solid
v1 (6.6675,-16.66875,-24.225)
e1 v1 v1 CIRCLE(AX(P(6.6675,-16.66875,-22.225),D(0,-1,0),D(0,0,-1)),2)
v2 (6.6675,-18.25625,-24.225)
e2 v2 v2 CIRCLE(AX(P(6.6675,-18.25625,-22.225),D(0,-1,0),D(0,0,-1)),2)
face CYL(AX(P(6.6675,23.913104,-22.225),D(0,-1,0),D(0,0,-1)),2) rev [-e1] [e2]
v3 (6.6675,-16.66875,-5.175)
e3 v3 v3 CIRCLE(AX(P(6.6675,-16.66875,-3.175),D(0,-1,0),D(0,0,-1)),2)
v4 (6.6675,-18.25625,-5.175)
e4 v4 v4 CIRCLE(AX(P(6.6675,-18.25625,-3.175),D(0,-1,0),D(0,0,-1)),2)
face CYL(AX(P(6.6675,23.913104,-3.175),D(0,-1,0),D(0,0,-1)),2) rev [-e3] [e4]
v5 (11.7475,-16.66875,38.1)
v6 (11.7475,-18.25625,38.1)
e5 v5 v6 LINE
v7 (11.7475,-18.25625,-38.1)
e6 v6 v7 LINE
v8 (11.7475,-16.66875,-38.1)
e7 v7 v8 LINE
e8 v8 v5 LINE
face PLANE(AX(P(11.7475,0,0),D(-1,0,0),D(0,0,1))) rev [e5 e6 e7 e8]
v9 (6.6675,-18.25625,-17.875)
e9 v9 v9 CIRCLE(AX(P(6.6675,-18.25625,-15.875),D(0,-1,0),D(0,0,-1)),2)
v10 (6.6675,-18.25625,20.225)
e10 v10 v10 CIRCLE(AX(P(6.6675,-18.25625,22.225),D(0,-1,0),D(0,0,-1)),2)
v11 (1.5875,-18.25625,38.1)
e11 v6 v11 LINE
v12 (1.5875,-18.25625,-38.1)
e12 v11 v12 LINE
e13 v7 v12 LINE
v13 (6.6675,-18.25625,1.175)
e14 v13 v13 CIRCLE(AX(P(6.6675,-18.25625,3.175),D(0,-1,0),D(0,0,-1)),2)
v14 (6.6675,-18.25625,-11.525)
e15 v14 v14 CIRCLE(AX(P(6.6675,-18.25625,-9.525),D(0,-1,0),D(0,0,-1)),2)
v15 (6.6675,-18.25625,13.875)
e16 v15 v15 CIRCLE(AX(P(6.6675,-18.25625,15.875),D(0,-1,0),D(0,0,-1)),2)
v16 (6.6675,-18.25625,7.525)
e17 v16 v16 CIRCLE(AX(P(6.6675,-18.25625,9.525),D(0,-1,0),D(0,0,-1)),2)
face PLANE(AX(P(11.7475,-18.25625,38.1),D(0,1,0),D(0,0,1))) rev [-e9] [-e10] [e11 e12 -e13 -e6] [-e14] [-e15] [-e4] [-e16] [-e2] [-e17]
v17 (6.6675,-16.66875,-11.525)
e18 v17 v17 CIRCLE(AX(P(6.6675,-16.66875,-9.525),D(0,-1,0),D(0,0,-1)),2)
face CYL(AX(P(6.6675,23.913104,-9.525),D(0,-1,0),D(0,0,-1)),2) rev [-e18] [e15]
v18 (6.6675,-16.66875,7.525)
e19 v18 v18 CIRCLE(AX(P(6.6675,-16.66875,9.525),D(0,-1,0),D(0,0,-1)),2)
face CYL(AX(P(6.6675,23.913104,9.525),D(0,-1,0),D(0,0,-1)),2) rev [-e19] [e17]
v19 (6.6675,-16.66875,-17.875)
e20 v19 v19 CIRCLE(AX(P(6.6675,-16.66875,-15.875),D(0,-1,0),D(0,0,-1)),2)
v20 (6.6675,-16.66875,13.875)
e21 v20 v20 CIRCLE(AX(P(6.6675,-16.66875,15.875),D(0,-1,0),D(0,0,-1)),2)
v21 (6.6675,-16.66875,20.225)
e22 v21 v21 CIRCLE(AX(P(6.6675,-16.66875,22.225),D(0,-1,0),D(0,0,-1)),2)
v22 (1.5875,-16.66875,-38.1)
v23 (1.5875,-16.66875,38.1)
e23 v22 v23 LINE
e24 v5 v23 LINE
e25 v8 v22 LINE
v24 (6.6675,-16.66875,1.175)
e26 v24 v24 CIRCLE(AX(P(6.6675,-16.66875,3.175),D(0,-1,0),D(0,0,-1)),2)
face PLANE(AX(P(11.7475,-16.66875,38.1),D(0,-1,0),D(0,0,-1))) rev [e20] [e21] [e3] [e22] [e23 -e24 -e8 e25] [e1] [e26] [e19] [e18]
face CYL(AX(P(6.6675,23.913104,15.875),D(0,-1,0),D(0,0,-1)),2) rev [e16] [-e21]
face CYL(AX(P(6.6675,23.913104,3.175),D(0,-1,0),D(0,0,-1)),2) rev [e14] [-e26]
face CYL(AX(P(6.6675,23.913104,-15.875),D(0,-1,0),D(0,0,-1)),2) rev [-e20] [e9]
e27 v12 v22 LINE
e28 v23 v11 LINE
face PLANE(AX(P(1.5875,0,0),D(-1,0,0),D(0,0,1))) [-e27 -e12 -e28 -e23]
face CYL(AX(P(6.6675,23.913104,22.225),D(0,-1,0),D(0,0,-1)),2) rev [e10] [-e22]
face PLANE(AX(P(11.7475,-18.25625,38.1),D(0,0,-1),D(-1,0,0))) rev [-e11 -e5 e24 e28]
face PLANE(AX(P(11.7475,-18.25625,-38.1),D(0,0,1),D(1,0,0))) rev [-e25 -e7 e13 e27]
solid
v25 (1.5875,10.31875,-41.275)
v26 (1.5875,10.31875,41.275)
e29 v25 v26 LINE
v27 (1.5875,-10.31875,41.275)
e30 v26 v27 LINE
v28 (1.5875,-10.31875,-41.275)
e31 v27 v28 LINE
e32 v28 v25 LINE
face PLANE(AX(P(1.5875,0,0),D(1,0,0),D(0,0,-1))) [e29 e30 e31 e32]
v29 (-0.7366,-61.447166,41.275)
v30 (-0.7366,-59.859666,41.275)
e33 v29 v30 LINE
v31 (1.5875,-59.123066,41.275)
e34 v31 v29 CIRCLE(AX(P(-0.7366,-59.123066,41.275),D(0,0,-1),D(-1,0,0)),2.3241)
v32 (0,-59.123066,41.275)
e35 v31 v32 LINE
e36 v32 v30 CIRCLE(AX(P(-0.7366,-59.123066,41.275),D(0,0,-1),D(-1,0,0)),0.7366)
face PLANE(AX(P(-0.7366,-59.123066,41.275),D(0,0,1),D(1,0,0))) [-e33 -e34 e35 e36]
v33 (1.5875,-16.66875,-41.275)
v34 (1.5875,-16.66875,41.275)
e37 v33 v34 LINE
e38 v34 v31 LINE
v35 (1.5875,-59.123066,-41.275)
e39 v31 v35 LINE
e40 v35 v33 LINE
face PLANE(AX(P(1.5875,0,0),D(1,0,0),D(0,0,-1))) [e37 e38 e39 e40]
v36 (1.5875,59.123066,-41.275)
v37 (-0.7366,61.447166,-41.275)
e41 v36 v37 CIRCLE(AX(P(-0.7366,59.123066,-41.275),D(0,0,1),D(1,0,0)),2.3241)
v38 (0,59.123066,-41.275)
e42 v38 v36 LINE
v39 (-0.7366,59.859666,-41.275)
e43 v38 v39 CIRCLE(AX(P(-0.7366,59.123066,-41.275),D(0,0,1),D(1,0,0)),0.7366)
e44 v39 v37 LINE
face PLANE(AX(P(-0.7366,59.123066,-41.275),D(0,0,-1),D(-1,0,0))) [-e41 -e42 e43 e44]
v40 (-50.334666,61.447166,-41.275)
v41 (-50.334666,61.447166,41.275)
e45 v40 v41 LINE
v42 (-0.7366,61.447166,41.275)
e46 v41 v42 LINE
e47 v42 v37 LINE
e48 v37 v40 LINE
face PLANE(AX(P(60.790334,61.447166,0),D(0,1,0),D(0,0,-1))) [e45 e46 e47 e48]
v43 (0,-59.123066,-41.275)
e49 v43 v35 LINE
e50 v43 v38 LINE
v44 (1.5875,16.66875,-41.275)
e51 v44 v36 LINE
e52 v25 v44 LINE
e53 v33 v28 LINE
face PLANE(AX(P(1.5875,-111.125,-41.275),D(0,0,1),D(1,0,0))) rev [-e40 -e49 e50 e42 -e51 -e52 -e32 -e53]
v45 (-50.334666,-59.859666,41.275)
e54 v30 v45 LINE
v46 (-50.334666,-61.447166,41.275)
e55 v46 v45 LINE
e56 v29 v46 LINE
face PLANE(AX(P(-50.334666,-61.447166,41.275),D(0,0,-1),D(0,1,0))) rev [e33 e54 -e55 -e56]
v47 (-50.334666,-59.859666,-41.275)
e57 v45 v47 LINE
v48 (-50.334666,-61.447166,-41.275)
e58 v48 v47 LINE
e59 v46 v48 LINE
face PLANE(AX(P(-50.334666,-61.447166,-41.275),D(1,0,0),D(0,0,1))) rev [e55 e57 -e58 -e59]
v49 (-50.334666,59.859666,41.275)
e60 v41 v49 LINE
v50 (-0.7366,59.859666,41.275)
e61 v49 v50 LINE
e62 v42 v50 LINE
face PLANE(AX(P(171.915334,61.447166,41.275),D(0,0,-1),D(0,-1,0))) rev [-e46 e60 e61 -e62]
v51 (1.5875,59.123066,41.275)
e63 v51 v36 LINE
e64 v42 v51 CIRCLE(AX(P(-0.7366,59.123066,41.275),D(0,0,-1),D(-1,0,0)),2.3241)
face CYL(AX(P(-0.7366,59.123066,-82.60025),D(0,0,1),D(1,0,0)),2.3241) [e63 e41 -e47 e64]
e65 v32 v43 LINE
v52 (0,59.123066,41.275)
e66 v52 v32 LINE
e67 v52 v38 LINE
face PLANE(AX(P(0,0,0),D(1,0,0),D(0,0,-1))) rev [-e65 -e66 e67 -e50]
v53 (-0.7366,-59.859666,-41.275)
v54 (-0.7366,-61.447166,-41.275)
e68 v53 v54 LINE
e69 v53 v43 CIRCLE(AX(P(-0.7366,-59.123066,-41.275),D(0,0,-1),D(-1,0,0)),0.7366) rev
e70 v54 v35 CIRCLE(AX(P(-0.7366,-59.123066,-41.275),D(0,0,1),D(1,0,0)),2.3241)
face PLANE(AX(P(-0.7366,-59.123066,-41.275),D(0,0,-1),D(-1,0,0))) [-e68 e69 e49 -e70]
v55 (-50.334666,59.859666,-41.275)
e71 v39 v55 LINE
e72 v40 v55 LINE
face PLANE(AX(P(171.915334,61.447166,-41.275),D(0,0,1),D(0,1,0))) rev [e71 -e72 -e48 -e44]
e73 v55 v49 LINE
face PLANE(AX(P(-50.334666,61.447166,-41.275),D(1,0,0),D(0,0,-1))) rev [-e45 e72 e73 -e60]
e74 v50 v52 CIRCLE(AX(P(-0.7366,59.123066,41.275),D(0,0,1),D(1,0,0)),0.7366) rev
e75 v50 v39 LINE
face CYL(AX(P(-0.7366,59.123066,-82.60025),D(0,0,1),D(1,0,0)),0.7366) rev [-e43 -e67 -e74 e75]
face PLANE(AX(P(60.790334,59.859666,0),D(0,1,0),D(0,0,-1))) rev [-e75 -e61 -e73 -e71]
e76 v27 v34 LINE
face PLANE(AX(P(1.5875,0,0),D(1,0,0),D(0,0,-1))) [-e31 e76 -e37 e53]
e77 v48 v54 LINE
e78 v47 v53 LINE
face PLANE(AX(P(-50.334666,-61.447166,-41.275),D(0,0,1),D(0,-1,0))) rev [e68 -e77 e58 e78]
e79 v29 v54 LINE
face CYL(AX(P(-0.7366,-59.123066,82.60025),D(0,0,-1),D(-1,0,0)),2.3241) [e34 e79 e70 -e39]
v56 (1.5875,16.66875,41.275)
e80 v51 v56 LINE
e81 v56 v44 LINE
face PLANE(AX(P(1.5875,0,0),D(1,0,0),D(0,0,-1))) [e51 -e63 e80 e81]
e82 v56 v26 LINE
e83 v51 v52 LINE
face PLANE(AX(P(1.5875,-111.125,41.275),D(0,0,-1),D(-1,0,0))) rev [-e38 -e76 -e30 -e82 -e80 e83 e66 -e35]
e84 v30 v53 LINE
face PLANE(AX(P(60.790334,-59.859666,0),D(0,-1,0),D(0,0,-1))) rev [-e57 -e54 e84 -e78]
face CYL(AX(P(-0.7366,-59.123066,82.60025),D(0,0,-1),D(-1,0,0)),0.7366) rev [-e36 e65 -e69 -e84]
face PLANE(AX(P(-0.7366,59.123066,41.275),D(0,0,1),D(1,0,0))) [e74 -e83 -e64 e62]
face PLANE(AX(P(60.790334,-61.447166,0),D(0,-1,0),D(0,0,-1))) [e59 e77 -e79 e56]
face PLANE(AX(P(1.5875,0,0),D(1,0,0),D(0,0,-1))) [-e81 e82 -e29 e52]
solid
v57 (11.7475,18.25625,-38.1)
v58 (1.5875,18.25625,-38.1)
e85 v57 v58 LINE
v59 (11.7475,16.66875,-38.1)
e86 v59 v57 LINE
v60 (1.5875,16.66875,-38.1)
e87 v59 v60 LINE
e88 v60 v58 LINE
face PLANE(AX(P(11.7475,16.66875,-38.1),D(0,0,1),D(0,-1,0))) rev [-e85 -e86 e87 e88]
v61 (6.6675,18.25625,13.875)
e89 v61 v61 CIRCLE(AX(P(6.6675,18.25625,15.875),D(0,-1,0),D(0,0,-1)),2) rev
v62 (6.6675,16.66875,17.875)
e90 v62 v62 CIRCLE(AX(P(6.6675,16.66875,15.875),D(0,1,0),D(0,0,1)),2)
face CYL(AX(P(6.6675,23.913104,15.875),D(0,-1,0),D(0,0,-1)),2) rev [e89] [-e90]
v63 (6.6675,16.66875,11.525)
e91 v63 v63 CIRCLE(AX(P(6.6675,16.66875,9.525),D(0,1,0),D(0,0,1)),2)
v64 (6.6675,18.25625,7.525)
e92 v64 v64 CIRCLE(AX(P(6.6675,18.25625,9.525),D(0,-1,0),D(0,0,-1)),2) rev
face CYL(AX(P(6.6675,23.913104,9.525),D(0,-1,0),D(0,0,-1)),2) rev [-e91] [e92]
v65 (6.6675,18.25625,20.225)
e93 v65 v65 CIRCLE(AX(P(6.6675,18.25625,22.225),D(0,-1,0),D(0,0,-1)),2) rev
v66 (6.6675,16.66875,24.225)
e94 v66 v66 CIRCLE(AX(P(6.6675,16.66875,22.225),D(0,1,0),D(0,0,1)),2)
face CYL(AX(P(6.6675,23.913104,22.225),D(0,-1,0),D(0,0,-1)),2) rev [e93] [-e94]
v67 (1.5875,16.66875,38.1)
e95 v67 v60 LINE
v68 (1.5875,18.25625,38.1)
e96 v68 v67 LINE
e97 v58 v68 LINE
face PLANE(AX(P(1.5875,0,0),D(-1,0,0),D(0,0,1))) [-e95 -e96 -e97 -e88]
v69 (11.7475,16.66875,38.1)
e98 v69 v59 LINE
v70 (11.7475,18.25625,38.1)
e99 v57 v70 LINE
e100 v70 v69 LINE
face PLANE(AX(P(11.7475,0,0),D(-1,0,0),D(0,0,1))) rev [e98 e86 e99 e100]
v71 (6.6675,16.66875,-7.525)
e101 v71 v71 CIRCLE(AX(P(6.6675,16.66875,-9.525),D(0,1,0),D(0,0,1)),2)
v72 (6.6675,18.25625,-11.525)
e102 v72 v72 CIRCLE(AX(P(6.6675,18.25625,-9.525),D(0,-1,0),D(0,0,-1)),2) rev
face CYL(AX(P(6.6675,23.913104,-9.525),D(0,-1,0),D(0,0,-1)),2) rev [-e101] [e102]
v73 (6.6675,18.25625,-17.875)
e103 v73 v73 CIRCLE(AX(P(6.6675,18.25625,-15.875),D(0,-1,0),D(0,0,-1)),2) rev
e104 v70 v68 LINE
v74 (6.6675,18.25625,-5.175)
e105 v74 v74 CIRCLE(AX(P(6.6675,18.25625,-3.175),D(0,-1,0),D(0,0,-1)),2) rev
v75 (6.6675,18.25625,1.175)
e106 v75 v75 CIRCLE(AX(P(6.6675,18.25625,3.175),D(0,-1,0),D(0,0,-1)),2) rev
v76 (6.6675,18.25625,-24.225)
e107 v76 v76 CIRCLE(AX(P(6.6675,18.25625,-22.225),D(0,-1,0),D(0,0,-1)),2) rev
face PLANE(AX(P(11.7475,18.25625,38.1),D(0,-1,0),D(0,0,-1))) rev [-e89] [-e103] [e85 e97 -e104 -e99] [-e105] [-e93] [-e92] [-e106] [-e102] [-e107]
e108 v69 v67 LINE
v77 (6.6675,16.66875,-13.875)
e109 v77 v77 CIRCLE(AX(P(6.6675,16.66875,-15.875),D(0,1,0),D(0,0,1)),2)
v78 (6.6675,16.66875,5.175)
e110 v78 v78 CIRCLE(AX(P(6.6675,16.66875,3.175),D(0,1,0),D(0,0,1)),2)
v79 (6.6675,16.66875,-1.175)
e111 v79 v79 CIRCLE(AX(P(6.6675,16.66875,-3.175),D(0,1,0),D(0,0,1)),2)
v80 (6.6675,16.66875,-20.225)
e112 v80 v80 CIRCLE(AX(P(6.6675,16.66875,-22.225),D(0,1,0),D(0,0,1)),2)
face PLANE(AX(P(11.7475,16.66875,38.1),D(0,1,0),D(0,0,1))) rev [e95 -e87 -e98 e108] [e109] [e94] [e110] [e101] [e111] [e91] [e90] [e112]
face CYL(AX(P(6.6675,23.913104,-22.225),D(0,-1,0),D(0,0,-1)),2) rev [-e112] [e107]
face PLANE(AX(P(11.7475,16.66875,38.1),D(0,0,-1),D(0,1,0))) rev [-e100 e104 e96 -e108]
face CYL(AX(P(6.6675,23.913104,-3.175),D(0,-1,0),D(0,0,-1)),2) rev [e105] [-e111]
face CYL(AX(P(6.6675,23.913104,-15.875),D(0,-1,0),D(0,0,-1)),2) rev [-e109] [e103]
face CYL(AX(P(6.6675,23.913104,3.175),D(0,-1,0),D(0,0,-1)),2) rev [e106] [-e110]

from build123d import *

# Parameters (mm, degrees)
SKETCH1_W              = 82.55
SKETCH1_H              = 222.25
BASE_FLANGE1_DEPTH     = 1.5875
SKETCHED_START         = -41.275
SKETCHED_BEND1_DEPTH   = 82.55
SKETCHED_BEND1_2_DEPTH = 82.55
SKETCH8_W              = 76.2
SKETCH8_H              = 1.5875
BOSS_EXTRUDE1_DEPTH    = 10.16
BOSS_EXTRUDE1_2_DEPTH  = 10.16
CUT_EXTRUDE1_START     = -36.5125
SKETCH11_R             = 2
CUT_EXTRUDE1_DEPTH     = 36.5125


# Read off the part's stored shape, not the designer's step: Sketched Bend1
# Sheet-metal steps are written as plain solids
with BuildPart() as part:
    # Sketch1 → Base-Flange1 (new body)
    with BuildSketch(Plane(origin=(0, 0, 0), x_dir=(0, 0, -1), z_dir=(1, 0, 0))):
        Rectangle(SKETCH1_W, SKETCH1_H)
    extrude(amount=BASE_FLANGE1_DEPTH)

    # Sketched Bend1 outline → Sketched Bend1 (cut)
    with BuildSketch(Plane.XY.offset(SKETCHED_START)):
        with BuildLine():
            ThreePointArc((0, 61.3273484), (1.149317929, 60.481283273), (1.5875, 59.123065921))
            Line((1.5875, 59.123065921), (1.5875, 111.125))
            Line((1.5875, 111.125), (0, 111.125))
            Line((0, 111.125), (0, 61.3273484))
        make_face()
        with BuildLine():
            Line((1.5875, -111.125), (1.5875, -59.123065921))
            ThreePointArc((1.5875, -59.123065921), (1.149317929, -60.481283273), (0, -61.3273484))
            Line((0, -61.3273484), (0, -111.125))
            Line((0, -111.125), (1.5875, -111.125))
        make_face()
    extrude(amount=SKETCHED_BEND1_DEPTH, mode=Mode.SUBTRACT)

    # Sketched Bend1 2 outline → Sketched Bend1 2 (add)
    with BuildSketch(Plane.XY.offset(SKETCHED_START)):
        with BuildLine():
            Line((0, 59.123065921), (0, 61.3273484))
            ThreePointArc((0, 61.3273484), (-0.363459343, 61.417015977), (-0.7366, 61.447165921))
            Line((-0.7366, 61.447165921), (-50.334665921, 61.447165921))
            Line((-50.334665921, 61.447165921), (-50.334665921, 59.859665921))
            Line((-50.334665921, 59.859665921), (-0.7366, 59.859665921))
            ThreePointArc((-0.7366, 59.859665921), (-0.215745145, 59.643920776), (0, 59.123065921))
        make_face()
        with BuildLine():
            ThreePointArc((-0.7366, -61.447165921), (-0.363459343, -61.417015977), (0, -61.3273484))
            Line((0, -61.3273484), (0, -59.123065921))
            ThreePointArc((0, -59.123065921), (-0.215745145, -59.643920776), (-0.7366, -59.859665921))
            Line((-0.7366, -59.859665921), (-50.334665921, -59.859665921))
            Line((-50.334665921, -59.859665921), (-50.334665921, -61.447165921))
            Line((-50.334665921, -61.447165921), (-0.7366, -61.447165921))
        make_face()
    extrude(amount=SKETCHED_BEND1_2_DEPTH)


with BuildPart() as body_2:
    # Sketch8 → Boss-Extrude1 (new body)
    with BuildSketch(Plane(origin=(1.5875, 0, 0), x_dir=(0, 0, -1), z_dir=(1, 0, 0))):
        with Locations((0, -17.4625)):
            Rectangle(SKETCH8_W, SKETCH8_H)
    extrude(amount=BOSS_EXTRUDE1_DEPTH)


with BuildPart() as body_3:
    # Sketch8 → Boss-Extrude1 2 (new body)
    with BuildSketch(Plane(origin=(1.5875, 0, 0), x_dir=(0, 0, -1), z_dir=(1, 0, 0))):
        with Locations((0, 17.4625)):
            Rectangle(SKETCH8_W, SKETCH8_H)
    extrude(amount=BOSS_EXTRUDE1_2_DEPTH)


with BuildPart() as cut_extrude1_tool:
    # Sketch11 → Cut-Extrude1 (new body)
    with BuildSketch(Plane.XZ.offset(18.25625).offset(CUT_EXTRUDE1_START)):
        with Locations(Location((6.6675, 3.175, 0), (0, 0, 270))):
            Circle(SKETCH11_R)
        with Locations(Location((6.6675, -3.175, 0), (0, 0, 270))):
            Circle(SKETCH11_R)
        with Locations(Location((6.6675, 9.525, 0), (0, 0, 270))):
            Circle(SKETCH11_R)
        with Locations(Location((6.6675, 15.875, 0), (0, 0, 270))):
            Circle(SKETCH11_R)
        with Locations(Location((6.6675, 22.225, 0), (0, 0, 270))):
            Circle(SKETCH11_R)
        with Locations(Location((6.6675, -9.525, 0), (0, 0, 270))):
            Circle(SKETCH11_R)
        with Locations(Location((6.6675, -15.875, 0), (0, 0, 270))):
            Circle(SKETCH11_R)
        with Locations(Location((6.6675, -22.225, 0), (0, 0, 270))):
            Circle(SKETCH11_R)
    extrude(amount=CUT_EXTRUDE1_DEPTH)


with BuildPart() as body_2_1:
    add(body_2.part)

    # Cut-Extrude1: cut by cut_extrude1_tool
    add(cut_extrude1_tool.part, mode=Mode.SUBTRACT)


with BuildPart() as body_3_1:
    add(body_3.part)

    # Cut-Extrude1: cut by cut_extrude1_tool
    add(cut_extrude1_tool.part, mode=Mode.SUBTRACT)


solid = Compound([part.part, body_2_1.part, body_3_1.part])
